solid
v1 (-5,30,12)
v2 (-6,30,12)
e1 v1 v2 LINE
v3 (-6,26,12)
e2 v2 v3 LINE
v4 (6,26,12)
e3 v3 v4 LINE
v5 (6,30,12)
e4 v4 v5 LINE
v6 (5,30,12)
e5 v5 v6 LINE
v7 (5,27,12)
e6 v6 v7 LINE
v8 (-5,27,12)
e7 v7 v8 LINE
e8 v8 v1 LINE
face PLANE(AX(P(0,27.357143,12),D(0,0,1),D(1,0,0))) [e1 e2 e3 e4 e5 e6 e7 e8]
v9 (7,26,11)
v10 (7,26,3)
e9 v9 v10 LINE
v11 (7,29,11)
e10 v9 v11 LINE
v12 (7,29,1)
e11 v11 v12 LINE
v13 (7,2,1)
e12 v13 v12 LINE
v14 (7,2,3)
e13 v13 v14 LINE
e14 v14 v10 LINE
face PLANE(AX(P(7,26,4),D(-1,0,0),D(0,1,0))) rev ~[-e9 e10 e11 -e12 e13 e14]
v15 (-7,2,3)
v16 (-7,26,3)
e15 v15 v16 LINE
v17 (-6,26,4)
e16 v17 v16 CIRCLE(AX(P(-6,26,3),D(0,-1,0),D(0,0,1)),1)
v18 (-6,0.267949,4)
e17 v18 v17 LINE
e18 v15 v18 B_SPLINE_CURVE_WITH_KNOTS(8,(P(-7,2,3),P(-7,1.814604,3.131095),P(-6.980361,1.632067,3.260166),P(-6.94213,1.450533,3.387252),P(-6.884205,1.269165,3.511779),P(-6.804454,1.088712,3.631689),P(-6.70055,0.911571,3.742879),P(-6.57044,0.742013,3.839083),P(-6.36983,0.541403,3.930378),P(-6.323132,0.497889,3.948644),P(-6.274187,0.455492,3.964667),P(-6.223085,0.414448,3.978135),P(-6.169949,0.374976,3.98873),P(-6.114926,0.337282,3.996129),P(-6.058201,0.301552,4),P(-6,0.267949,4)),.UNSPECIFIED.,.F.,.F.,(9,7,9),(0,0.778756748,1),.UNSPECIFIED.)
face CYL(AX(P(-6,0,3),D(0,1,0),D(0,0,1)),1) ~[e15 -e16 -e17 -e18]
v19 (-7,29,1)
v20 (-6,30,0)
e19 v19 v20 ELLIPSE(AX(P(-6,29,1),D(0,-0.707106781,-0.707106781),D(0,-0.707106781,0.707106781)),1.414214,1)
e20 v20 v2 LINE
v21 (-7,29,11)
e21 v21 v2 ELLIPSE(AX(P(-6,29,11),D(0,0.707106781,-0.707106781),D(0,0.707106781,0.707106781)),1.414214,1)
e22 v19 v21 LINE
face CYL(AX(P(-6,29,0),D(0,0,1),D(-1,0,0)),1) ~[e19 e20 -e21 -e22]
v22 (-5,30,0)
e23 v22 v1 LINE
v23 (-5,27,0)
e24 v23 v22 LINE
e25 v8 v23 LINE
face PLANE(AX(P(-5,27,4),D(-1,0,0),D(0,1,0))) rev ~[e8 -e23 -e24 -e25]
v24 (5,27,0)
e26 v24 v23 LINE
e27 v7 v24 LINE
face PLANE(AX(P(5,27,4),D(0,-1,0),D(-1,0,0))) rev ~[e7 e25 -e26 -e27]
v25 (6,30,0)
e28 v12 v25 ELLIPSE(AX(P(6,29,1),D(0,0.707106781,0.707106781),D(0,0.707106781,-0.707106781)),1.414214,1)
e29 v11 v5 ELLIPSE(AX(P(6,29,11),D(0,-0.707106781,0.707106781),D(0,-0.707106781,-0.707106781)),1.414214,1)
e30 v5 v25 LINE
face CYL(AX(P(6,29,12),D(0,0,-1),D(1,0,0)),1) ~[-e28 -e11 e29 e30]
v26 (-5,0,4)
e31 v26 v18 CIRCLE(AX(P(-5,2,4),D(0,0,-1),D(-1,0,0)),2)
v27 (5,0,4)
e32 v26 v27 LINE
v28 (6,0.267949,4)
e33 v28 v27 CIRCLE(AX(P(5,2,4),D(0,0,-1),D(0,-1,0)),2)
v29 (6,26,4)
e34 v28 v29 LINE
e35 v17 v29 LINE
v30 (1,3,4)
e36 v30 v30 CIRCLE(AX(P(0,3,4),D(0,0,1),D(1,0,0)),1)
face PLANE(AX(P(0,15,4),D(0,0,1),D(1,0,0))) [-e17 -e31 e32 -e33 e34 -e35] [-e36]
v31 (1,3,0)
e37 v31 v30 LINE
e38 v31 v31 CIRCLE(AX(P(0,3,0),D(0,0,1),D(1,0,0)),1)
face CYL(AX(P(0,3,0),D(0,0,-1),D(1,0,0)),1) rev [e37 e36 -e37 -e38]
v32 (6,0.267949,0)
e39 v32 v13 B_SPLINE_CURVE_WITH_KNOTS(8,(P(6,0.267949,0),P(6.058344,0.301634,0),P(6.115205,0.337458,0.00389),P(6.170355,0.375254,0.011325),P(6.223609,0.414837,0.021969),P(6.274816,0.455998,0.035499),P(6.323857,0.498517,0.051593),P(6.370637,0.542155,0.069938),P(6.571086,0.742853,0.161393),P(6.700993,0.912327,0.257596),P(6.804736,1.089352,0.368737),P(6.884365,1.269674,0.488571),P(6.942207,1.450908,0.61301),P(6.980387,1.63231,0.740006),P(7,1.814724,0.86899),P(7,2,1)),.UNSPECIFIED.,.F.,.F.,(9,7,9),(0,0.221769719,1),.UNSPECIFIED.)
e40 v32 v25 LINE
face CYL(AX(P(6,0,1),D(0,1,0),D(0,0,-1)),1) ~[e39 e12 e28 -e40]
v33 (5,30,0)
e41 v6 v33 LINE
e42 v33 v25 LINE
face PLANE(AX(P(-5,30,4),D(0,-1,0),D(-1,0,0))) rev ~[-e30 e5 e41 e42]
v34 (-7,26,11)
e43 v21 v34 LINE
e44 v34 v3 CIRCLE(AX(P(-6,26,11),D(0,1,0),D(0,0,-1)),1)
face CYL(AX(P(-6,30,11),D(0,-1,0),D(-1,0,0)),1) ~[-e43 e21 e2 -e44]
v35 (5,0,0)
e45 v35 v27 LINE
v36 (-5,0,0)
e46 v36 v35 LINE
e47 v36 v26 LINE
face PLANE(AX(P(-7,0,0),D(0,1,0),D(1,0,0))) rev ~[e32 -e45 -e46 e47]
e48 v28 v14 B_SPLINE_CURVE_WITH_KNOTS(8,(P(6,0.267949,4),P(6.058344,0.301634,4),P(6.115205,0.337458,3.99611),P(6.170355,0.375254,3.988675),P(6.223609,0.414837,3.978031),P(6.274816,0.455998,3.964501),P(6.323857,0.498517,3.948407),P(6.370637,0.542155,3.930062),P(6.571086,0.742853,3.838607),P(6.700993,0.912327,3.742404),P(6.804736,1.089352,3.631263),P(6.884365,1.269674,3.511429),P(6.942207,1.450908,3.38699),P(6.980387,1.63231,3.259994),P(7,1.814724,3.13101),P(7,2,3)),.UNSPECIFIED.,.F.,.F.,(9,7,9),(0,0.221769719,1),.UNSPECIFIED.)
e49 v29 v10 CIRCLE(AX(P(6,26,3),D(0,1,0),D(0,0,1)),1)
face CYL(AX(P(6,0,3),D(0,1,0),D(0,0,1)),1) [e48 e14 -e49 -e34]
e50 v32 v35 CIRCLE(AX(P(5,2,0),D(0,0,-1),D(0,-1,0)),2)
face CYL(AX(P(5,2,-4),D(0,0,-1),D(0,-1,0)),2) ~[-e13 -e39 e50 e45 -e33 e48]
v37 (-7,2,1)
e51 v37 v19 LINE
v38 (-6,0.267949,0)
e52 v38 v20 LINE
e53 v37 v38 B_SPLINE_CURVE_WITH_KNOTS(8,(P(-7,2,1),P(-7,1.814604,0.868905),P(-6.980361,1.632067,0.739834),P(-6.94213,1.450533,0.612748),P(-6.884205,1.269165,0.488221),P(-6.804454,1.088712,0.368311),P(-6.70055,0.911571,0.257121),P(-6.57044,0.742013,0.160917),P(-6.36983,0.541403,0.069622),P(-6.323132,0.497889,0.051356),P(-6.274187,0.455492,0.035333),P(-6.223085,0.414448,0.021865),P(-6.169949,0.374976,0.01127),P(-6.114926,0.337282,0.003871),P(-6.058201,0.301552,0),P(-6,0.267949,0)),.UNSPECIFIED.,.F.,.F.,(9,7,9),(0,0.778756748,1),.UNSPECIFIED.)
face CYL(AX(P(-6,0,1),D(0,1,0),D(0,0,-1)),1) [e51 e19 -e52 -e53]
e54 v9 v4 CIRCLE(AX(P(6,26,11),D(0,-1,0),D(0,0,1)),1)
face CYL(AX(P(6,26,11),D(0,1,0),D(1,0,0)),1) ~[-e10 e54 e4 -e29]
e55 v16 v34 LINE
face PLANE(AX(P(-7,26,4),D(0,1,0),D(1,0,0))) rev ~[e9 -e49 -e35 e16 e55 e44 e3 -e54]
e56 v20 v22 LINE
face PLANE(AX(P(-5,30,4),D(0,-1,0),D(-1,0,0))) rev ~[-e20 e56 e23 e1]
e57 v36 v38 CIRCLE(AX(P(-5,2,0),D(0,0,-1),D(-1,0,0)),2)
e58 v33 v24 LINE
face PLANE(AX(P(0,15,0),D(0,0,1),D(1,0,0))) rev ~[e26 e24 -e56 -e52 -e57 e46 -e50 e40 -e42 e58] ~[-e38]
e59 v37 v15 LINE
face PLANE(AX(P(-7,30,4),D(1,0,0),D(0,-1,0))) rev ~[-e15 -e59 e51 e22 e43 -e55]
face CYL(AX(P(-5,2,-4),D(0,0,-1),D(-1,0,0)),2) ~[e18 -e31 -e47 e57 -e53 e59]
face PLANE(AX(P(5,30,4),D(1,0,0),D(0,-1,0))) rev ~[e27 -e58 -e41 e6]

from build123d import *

# Parameters (mm, degrees)
F0_W        = 14
F0_H        = 30
F0_R        = 1
F1_DEPTH    = 4
F3_DEPTH    = 8
F4_DEPTH    = 4.001
F5_R        = 1
F6_T1_DEPTH = 12


# Not quite as in the source:
# - a fillet or chamfer that OpenCascade refuses, or shapes differently, is made with other operations: its cross-section is extruded or revolved along the edge and cut away or added


with BuildPart() as f1:
    # F0 (on Top) → F1 (new body)
    with BuildSketch(Plane.XY):
        with Locations((0, 15)):
            Rectangle(F0_W, F0_H)
        with Locations((0, 3)):
            Circle(F0_R, mode=Mode.SUBTRACT)
    extrude(amount=F1_DEPTH)

    # F2 (on face) → F3 (join)
    with BuildSketch(Plane.XY.offset(4)):
        Polygon((-5, 27), (-5, 30), (-7, 30), (-7, 26), (7, 26), (7, 30), (5, 30), (5, 27), align=None)
    extrude(amount=F3_DEPTH)

    # F4 (cut, through all): a face of the model
    f4_faces = [f1.faces().sort_by_distance(p)[0] for p in [
        (0, 28.5, 4),
    ]]
    extrude(f4_faces, amount=-F4_DEPTH, mode=Mode.SUBTRACT)

    # F5
    f5_edges = [f1.edges().sort_by_distance(p)[0] for p in [
        (-7, 30, 6),
        (7, 30, 6),
        (-7, 28, 12),
        (7, 28, 12),
        (7, 15, 0),
        (-7, 15, 0),
        (-7, 13, 4),
        (7, 13, 4),
    ]]
    fillet(f5_edges, radius=F5_R)

    # F6: fillet of radius 2 on 2 edges, made by hand

    # F6_s2 → F6_t1 (cut)
    with BuildSketch(Plane.XY.offset(-4)):
        with BuildLine():
            ThreePointArc((-7, 2), (-6.4142135624, 0.5857864376), (-5, 0))
            Line((-5, 0), (-7, 0))
            Line((-7, 0), (-7, 2))
        make_face()
        with BuildLine():
            ThreePointArc((5, 0), (6.4142135624, 0.5857864376), (7, 2))
            Line((7, 2), (7, 0))
            Line((7, 0), (5, 0))
        make_face()
    extrude(amount=F6_T1_DEPTH, mode=Mode.SUBTRACT)


solid = f1.part
